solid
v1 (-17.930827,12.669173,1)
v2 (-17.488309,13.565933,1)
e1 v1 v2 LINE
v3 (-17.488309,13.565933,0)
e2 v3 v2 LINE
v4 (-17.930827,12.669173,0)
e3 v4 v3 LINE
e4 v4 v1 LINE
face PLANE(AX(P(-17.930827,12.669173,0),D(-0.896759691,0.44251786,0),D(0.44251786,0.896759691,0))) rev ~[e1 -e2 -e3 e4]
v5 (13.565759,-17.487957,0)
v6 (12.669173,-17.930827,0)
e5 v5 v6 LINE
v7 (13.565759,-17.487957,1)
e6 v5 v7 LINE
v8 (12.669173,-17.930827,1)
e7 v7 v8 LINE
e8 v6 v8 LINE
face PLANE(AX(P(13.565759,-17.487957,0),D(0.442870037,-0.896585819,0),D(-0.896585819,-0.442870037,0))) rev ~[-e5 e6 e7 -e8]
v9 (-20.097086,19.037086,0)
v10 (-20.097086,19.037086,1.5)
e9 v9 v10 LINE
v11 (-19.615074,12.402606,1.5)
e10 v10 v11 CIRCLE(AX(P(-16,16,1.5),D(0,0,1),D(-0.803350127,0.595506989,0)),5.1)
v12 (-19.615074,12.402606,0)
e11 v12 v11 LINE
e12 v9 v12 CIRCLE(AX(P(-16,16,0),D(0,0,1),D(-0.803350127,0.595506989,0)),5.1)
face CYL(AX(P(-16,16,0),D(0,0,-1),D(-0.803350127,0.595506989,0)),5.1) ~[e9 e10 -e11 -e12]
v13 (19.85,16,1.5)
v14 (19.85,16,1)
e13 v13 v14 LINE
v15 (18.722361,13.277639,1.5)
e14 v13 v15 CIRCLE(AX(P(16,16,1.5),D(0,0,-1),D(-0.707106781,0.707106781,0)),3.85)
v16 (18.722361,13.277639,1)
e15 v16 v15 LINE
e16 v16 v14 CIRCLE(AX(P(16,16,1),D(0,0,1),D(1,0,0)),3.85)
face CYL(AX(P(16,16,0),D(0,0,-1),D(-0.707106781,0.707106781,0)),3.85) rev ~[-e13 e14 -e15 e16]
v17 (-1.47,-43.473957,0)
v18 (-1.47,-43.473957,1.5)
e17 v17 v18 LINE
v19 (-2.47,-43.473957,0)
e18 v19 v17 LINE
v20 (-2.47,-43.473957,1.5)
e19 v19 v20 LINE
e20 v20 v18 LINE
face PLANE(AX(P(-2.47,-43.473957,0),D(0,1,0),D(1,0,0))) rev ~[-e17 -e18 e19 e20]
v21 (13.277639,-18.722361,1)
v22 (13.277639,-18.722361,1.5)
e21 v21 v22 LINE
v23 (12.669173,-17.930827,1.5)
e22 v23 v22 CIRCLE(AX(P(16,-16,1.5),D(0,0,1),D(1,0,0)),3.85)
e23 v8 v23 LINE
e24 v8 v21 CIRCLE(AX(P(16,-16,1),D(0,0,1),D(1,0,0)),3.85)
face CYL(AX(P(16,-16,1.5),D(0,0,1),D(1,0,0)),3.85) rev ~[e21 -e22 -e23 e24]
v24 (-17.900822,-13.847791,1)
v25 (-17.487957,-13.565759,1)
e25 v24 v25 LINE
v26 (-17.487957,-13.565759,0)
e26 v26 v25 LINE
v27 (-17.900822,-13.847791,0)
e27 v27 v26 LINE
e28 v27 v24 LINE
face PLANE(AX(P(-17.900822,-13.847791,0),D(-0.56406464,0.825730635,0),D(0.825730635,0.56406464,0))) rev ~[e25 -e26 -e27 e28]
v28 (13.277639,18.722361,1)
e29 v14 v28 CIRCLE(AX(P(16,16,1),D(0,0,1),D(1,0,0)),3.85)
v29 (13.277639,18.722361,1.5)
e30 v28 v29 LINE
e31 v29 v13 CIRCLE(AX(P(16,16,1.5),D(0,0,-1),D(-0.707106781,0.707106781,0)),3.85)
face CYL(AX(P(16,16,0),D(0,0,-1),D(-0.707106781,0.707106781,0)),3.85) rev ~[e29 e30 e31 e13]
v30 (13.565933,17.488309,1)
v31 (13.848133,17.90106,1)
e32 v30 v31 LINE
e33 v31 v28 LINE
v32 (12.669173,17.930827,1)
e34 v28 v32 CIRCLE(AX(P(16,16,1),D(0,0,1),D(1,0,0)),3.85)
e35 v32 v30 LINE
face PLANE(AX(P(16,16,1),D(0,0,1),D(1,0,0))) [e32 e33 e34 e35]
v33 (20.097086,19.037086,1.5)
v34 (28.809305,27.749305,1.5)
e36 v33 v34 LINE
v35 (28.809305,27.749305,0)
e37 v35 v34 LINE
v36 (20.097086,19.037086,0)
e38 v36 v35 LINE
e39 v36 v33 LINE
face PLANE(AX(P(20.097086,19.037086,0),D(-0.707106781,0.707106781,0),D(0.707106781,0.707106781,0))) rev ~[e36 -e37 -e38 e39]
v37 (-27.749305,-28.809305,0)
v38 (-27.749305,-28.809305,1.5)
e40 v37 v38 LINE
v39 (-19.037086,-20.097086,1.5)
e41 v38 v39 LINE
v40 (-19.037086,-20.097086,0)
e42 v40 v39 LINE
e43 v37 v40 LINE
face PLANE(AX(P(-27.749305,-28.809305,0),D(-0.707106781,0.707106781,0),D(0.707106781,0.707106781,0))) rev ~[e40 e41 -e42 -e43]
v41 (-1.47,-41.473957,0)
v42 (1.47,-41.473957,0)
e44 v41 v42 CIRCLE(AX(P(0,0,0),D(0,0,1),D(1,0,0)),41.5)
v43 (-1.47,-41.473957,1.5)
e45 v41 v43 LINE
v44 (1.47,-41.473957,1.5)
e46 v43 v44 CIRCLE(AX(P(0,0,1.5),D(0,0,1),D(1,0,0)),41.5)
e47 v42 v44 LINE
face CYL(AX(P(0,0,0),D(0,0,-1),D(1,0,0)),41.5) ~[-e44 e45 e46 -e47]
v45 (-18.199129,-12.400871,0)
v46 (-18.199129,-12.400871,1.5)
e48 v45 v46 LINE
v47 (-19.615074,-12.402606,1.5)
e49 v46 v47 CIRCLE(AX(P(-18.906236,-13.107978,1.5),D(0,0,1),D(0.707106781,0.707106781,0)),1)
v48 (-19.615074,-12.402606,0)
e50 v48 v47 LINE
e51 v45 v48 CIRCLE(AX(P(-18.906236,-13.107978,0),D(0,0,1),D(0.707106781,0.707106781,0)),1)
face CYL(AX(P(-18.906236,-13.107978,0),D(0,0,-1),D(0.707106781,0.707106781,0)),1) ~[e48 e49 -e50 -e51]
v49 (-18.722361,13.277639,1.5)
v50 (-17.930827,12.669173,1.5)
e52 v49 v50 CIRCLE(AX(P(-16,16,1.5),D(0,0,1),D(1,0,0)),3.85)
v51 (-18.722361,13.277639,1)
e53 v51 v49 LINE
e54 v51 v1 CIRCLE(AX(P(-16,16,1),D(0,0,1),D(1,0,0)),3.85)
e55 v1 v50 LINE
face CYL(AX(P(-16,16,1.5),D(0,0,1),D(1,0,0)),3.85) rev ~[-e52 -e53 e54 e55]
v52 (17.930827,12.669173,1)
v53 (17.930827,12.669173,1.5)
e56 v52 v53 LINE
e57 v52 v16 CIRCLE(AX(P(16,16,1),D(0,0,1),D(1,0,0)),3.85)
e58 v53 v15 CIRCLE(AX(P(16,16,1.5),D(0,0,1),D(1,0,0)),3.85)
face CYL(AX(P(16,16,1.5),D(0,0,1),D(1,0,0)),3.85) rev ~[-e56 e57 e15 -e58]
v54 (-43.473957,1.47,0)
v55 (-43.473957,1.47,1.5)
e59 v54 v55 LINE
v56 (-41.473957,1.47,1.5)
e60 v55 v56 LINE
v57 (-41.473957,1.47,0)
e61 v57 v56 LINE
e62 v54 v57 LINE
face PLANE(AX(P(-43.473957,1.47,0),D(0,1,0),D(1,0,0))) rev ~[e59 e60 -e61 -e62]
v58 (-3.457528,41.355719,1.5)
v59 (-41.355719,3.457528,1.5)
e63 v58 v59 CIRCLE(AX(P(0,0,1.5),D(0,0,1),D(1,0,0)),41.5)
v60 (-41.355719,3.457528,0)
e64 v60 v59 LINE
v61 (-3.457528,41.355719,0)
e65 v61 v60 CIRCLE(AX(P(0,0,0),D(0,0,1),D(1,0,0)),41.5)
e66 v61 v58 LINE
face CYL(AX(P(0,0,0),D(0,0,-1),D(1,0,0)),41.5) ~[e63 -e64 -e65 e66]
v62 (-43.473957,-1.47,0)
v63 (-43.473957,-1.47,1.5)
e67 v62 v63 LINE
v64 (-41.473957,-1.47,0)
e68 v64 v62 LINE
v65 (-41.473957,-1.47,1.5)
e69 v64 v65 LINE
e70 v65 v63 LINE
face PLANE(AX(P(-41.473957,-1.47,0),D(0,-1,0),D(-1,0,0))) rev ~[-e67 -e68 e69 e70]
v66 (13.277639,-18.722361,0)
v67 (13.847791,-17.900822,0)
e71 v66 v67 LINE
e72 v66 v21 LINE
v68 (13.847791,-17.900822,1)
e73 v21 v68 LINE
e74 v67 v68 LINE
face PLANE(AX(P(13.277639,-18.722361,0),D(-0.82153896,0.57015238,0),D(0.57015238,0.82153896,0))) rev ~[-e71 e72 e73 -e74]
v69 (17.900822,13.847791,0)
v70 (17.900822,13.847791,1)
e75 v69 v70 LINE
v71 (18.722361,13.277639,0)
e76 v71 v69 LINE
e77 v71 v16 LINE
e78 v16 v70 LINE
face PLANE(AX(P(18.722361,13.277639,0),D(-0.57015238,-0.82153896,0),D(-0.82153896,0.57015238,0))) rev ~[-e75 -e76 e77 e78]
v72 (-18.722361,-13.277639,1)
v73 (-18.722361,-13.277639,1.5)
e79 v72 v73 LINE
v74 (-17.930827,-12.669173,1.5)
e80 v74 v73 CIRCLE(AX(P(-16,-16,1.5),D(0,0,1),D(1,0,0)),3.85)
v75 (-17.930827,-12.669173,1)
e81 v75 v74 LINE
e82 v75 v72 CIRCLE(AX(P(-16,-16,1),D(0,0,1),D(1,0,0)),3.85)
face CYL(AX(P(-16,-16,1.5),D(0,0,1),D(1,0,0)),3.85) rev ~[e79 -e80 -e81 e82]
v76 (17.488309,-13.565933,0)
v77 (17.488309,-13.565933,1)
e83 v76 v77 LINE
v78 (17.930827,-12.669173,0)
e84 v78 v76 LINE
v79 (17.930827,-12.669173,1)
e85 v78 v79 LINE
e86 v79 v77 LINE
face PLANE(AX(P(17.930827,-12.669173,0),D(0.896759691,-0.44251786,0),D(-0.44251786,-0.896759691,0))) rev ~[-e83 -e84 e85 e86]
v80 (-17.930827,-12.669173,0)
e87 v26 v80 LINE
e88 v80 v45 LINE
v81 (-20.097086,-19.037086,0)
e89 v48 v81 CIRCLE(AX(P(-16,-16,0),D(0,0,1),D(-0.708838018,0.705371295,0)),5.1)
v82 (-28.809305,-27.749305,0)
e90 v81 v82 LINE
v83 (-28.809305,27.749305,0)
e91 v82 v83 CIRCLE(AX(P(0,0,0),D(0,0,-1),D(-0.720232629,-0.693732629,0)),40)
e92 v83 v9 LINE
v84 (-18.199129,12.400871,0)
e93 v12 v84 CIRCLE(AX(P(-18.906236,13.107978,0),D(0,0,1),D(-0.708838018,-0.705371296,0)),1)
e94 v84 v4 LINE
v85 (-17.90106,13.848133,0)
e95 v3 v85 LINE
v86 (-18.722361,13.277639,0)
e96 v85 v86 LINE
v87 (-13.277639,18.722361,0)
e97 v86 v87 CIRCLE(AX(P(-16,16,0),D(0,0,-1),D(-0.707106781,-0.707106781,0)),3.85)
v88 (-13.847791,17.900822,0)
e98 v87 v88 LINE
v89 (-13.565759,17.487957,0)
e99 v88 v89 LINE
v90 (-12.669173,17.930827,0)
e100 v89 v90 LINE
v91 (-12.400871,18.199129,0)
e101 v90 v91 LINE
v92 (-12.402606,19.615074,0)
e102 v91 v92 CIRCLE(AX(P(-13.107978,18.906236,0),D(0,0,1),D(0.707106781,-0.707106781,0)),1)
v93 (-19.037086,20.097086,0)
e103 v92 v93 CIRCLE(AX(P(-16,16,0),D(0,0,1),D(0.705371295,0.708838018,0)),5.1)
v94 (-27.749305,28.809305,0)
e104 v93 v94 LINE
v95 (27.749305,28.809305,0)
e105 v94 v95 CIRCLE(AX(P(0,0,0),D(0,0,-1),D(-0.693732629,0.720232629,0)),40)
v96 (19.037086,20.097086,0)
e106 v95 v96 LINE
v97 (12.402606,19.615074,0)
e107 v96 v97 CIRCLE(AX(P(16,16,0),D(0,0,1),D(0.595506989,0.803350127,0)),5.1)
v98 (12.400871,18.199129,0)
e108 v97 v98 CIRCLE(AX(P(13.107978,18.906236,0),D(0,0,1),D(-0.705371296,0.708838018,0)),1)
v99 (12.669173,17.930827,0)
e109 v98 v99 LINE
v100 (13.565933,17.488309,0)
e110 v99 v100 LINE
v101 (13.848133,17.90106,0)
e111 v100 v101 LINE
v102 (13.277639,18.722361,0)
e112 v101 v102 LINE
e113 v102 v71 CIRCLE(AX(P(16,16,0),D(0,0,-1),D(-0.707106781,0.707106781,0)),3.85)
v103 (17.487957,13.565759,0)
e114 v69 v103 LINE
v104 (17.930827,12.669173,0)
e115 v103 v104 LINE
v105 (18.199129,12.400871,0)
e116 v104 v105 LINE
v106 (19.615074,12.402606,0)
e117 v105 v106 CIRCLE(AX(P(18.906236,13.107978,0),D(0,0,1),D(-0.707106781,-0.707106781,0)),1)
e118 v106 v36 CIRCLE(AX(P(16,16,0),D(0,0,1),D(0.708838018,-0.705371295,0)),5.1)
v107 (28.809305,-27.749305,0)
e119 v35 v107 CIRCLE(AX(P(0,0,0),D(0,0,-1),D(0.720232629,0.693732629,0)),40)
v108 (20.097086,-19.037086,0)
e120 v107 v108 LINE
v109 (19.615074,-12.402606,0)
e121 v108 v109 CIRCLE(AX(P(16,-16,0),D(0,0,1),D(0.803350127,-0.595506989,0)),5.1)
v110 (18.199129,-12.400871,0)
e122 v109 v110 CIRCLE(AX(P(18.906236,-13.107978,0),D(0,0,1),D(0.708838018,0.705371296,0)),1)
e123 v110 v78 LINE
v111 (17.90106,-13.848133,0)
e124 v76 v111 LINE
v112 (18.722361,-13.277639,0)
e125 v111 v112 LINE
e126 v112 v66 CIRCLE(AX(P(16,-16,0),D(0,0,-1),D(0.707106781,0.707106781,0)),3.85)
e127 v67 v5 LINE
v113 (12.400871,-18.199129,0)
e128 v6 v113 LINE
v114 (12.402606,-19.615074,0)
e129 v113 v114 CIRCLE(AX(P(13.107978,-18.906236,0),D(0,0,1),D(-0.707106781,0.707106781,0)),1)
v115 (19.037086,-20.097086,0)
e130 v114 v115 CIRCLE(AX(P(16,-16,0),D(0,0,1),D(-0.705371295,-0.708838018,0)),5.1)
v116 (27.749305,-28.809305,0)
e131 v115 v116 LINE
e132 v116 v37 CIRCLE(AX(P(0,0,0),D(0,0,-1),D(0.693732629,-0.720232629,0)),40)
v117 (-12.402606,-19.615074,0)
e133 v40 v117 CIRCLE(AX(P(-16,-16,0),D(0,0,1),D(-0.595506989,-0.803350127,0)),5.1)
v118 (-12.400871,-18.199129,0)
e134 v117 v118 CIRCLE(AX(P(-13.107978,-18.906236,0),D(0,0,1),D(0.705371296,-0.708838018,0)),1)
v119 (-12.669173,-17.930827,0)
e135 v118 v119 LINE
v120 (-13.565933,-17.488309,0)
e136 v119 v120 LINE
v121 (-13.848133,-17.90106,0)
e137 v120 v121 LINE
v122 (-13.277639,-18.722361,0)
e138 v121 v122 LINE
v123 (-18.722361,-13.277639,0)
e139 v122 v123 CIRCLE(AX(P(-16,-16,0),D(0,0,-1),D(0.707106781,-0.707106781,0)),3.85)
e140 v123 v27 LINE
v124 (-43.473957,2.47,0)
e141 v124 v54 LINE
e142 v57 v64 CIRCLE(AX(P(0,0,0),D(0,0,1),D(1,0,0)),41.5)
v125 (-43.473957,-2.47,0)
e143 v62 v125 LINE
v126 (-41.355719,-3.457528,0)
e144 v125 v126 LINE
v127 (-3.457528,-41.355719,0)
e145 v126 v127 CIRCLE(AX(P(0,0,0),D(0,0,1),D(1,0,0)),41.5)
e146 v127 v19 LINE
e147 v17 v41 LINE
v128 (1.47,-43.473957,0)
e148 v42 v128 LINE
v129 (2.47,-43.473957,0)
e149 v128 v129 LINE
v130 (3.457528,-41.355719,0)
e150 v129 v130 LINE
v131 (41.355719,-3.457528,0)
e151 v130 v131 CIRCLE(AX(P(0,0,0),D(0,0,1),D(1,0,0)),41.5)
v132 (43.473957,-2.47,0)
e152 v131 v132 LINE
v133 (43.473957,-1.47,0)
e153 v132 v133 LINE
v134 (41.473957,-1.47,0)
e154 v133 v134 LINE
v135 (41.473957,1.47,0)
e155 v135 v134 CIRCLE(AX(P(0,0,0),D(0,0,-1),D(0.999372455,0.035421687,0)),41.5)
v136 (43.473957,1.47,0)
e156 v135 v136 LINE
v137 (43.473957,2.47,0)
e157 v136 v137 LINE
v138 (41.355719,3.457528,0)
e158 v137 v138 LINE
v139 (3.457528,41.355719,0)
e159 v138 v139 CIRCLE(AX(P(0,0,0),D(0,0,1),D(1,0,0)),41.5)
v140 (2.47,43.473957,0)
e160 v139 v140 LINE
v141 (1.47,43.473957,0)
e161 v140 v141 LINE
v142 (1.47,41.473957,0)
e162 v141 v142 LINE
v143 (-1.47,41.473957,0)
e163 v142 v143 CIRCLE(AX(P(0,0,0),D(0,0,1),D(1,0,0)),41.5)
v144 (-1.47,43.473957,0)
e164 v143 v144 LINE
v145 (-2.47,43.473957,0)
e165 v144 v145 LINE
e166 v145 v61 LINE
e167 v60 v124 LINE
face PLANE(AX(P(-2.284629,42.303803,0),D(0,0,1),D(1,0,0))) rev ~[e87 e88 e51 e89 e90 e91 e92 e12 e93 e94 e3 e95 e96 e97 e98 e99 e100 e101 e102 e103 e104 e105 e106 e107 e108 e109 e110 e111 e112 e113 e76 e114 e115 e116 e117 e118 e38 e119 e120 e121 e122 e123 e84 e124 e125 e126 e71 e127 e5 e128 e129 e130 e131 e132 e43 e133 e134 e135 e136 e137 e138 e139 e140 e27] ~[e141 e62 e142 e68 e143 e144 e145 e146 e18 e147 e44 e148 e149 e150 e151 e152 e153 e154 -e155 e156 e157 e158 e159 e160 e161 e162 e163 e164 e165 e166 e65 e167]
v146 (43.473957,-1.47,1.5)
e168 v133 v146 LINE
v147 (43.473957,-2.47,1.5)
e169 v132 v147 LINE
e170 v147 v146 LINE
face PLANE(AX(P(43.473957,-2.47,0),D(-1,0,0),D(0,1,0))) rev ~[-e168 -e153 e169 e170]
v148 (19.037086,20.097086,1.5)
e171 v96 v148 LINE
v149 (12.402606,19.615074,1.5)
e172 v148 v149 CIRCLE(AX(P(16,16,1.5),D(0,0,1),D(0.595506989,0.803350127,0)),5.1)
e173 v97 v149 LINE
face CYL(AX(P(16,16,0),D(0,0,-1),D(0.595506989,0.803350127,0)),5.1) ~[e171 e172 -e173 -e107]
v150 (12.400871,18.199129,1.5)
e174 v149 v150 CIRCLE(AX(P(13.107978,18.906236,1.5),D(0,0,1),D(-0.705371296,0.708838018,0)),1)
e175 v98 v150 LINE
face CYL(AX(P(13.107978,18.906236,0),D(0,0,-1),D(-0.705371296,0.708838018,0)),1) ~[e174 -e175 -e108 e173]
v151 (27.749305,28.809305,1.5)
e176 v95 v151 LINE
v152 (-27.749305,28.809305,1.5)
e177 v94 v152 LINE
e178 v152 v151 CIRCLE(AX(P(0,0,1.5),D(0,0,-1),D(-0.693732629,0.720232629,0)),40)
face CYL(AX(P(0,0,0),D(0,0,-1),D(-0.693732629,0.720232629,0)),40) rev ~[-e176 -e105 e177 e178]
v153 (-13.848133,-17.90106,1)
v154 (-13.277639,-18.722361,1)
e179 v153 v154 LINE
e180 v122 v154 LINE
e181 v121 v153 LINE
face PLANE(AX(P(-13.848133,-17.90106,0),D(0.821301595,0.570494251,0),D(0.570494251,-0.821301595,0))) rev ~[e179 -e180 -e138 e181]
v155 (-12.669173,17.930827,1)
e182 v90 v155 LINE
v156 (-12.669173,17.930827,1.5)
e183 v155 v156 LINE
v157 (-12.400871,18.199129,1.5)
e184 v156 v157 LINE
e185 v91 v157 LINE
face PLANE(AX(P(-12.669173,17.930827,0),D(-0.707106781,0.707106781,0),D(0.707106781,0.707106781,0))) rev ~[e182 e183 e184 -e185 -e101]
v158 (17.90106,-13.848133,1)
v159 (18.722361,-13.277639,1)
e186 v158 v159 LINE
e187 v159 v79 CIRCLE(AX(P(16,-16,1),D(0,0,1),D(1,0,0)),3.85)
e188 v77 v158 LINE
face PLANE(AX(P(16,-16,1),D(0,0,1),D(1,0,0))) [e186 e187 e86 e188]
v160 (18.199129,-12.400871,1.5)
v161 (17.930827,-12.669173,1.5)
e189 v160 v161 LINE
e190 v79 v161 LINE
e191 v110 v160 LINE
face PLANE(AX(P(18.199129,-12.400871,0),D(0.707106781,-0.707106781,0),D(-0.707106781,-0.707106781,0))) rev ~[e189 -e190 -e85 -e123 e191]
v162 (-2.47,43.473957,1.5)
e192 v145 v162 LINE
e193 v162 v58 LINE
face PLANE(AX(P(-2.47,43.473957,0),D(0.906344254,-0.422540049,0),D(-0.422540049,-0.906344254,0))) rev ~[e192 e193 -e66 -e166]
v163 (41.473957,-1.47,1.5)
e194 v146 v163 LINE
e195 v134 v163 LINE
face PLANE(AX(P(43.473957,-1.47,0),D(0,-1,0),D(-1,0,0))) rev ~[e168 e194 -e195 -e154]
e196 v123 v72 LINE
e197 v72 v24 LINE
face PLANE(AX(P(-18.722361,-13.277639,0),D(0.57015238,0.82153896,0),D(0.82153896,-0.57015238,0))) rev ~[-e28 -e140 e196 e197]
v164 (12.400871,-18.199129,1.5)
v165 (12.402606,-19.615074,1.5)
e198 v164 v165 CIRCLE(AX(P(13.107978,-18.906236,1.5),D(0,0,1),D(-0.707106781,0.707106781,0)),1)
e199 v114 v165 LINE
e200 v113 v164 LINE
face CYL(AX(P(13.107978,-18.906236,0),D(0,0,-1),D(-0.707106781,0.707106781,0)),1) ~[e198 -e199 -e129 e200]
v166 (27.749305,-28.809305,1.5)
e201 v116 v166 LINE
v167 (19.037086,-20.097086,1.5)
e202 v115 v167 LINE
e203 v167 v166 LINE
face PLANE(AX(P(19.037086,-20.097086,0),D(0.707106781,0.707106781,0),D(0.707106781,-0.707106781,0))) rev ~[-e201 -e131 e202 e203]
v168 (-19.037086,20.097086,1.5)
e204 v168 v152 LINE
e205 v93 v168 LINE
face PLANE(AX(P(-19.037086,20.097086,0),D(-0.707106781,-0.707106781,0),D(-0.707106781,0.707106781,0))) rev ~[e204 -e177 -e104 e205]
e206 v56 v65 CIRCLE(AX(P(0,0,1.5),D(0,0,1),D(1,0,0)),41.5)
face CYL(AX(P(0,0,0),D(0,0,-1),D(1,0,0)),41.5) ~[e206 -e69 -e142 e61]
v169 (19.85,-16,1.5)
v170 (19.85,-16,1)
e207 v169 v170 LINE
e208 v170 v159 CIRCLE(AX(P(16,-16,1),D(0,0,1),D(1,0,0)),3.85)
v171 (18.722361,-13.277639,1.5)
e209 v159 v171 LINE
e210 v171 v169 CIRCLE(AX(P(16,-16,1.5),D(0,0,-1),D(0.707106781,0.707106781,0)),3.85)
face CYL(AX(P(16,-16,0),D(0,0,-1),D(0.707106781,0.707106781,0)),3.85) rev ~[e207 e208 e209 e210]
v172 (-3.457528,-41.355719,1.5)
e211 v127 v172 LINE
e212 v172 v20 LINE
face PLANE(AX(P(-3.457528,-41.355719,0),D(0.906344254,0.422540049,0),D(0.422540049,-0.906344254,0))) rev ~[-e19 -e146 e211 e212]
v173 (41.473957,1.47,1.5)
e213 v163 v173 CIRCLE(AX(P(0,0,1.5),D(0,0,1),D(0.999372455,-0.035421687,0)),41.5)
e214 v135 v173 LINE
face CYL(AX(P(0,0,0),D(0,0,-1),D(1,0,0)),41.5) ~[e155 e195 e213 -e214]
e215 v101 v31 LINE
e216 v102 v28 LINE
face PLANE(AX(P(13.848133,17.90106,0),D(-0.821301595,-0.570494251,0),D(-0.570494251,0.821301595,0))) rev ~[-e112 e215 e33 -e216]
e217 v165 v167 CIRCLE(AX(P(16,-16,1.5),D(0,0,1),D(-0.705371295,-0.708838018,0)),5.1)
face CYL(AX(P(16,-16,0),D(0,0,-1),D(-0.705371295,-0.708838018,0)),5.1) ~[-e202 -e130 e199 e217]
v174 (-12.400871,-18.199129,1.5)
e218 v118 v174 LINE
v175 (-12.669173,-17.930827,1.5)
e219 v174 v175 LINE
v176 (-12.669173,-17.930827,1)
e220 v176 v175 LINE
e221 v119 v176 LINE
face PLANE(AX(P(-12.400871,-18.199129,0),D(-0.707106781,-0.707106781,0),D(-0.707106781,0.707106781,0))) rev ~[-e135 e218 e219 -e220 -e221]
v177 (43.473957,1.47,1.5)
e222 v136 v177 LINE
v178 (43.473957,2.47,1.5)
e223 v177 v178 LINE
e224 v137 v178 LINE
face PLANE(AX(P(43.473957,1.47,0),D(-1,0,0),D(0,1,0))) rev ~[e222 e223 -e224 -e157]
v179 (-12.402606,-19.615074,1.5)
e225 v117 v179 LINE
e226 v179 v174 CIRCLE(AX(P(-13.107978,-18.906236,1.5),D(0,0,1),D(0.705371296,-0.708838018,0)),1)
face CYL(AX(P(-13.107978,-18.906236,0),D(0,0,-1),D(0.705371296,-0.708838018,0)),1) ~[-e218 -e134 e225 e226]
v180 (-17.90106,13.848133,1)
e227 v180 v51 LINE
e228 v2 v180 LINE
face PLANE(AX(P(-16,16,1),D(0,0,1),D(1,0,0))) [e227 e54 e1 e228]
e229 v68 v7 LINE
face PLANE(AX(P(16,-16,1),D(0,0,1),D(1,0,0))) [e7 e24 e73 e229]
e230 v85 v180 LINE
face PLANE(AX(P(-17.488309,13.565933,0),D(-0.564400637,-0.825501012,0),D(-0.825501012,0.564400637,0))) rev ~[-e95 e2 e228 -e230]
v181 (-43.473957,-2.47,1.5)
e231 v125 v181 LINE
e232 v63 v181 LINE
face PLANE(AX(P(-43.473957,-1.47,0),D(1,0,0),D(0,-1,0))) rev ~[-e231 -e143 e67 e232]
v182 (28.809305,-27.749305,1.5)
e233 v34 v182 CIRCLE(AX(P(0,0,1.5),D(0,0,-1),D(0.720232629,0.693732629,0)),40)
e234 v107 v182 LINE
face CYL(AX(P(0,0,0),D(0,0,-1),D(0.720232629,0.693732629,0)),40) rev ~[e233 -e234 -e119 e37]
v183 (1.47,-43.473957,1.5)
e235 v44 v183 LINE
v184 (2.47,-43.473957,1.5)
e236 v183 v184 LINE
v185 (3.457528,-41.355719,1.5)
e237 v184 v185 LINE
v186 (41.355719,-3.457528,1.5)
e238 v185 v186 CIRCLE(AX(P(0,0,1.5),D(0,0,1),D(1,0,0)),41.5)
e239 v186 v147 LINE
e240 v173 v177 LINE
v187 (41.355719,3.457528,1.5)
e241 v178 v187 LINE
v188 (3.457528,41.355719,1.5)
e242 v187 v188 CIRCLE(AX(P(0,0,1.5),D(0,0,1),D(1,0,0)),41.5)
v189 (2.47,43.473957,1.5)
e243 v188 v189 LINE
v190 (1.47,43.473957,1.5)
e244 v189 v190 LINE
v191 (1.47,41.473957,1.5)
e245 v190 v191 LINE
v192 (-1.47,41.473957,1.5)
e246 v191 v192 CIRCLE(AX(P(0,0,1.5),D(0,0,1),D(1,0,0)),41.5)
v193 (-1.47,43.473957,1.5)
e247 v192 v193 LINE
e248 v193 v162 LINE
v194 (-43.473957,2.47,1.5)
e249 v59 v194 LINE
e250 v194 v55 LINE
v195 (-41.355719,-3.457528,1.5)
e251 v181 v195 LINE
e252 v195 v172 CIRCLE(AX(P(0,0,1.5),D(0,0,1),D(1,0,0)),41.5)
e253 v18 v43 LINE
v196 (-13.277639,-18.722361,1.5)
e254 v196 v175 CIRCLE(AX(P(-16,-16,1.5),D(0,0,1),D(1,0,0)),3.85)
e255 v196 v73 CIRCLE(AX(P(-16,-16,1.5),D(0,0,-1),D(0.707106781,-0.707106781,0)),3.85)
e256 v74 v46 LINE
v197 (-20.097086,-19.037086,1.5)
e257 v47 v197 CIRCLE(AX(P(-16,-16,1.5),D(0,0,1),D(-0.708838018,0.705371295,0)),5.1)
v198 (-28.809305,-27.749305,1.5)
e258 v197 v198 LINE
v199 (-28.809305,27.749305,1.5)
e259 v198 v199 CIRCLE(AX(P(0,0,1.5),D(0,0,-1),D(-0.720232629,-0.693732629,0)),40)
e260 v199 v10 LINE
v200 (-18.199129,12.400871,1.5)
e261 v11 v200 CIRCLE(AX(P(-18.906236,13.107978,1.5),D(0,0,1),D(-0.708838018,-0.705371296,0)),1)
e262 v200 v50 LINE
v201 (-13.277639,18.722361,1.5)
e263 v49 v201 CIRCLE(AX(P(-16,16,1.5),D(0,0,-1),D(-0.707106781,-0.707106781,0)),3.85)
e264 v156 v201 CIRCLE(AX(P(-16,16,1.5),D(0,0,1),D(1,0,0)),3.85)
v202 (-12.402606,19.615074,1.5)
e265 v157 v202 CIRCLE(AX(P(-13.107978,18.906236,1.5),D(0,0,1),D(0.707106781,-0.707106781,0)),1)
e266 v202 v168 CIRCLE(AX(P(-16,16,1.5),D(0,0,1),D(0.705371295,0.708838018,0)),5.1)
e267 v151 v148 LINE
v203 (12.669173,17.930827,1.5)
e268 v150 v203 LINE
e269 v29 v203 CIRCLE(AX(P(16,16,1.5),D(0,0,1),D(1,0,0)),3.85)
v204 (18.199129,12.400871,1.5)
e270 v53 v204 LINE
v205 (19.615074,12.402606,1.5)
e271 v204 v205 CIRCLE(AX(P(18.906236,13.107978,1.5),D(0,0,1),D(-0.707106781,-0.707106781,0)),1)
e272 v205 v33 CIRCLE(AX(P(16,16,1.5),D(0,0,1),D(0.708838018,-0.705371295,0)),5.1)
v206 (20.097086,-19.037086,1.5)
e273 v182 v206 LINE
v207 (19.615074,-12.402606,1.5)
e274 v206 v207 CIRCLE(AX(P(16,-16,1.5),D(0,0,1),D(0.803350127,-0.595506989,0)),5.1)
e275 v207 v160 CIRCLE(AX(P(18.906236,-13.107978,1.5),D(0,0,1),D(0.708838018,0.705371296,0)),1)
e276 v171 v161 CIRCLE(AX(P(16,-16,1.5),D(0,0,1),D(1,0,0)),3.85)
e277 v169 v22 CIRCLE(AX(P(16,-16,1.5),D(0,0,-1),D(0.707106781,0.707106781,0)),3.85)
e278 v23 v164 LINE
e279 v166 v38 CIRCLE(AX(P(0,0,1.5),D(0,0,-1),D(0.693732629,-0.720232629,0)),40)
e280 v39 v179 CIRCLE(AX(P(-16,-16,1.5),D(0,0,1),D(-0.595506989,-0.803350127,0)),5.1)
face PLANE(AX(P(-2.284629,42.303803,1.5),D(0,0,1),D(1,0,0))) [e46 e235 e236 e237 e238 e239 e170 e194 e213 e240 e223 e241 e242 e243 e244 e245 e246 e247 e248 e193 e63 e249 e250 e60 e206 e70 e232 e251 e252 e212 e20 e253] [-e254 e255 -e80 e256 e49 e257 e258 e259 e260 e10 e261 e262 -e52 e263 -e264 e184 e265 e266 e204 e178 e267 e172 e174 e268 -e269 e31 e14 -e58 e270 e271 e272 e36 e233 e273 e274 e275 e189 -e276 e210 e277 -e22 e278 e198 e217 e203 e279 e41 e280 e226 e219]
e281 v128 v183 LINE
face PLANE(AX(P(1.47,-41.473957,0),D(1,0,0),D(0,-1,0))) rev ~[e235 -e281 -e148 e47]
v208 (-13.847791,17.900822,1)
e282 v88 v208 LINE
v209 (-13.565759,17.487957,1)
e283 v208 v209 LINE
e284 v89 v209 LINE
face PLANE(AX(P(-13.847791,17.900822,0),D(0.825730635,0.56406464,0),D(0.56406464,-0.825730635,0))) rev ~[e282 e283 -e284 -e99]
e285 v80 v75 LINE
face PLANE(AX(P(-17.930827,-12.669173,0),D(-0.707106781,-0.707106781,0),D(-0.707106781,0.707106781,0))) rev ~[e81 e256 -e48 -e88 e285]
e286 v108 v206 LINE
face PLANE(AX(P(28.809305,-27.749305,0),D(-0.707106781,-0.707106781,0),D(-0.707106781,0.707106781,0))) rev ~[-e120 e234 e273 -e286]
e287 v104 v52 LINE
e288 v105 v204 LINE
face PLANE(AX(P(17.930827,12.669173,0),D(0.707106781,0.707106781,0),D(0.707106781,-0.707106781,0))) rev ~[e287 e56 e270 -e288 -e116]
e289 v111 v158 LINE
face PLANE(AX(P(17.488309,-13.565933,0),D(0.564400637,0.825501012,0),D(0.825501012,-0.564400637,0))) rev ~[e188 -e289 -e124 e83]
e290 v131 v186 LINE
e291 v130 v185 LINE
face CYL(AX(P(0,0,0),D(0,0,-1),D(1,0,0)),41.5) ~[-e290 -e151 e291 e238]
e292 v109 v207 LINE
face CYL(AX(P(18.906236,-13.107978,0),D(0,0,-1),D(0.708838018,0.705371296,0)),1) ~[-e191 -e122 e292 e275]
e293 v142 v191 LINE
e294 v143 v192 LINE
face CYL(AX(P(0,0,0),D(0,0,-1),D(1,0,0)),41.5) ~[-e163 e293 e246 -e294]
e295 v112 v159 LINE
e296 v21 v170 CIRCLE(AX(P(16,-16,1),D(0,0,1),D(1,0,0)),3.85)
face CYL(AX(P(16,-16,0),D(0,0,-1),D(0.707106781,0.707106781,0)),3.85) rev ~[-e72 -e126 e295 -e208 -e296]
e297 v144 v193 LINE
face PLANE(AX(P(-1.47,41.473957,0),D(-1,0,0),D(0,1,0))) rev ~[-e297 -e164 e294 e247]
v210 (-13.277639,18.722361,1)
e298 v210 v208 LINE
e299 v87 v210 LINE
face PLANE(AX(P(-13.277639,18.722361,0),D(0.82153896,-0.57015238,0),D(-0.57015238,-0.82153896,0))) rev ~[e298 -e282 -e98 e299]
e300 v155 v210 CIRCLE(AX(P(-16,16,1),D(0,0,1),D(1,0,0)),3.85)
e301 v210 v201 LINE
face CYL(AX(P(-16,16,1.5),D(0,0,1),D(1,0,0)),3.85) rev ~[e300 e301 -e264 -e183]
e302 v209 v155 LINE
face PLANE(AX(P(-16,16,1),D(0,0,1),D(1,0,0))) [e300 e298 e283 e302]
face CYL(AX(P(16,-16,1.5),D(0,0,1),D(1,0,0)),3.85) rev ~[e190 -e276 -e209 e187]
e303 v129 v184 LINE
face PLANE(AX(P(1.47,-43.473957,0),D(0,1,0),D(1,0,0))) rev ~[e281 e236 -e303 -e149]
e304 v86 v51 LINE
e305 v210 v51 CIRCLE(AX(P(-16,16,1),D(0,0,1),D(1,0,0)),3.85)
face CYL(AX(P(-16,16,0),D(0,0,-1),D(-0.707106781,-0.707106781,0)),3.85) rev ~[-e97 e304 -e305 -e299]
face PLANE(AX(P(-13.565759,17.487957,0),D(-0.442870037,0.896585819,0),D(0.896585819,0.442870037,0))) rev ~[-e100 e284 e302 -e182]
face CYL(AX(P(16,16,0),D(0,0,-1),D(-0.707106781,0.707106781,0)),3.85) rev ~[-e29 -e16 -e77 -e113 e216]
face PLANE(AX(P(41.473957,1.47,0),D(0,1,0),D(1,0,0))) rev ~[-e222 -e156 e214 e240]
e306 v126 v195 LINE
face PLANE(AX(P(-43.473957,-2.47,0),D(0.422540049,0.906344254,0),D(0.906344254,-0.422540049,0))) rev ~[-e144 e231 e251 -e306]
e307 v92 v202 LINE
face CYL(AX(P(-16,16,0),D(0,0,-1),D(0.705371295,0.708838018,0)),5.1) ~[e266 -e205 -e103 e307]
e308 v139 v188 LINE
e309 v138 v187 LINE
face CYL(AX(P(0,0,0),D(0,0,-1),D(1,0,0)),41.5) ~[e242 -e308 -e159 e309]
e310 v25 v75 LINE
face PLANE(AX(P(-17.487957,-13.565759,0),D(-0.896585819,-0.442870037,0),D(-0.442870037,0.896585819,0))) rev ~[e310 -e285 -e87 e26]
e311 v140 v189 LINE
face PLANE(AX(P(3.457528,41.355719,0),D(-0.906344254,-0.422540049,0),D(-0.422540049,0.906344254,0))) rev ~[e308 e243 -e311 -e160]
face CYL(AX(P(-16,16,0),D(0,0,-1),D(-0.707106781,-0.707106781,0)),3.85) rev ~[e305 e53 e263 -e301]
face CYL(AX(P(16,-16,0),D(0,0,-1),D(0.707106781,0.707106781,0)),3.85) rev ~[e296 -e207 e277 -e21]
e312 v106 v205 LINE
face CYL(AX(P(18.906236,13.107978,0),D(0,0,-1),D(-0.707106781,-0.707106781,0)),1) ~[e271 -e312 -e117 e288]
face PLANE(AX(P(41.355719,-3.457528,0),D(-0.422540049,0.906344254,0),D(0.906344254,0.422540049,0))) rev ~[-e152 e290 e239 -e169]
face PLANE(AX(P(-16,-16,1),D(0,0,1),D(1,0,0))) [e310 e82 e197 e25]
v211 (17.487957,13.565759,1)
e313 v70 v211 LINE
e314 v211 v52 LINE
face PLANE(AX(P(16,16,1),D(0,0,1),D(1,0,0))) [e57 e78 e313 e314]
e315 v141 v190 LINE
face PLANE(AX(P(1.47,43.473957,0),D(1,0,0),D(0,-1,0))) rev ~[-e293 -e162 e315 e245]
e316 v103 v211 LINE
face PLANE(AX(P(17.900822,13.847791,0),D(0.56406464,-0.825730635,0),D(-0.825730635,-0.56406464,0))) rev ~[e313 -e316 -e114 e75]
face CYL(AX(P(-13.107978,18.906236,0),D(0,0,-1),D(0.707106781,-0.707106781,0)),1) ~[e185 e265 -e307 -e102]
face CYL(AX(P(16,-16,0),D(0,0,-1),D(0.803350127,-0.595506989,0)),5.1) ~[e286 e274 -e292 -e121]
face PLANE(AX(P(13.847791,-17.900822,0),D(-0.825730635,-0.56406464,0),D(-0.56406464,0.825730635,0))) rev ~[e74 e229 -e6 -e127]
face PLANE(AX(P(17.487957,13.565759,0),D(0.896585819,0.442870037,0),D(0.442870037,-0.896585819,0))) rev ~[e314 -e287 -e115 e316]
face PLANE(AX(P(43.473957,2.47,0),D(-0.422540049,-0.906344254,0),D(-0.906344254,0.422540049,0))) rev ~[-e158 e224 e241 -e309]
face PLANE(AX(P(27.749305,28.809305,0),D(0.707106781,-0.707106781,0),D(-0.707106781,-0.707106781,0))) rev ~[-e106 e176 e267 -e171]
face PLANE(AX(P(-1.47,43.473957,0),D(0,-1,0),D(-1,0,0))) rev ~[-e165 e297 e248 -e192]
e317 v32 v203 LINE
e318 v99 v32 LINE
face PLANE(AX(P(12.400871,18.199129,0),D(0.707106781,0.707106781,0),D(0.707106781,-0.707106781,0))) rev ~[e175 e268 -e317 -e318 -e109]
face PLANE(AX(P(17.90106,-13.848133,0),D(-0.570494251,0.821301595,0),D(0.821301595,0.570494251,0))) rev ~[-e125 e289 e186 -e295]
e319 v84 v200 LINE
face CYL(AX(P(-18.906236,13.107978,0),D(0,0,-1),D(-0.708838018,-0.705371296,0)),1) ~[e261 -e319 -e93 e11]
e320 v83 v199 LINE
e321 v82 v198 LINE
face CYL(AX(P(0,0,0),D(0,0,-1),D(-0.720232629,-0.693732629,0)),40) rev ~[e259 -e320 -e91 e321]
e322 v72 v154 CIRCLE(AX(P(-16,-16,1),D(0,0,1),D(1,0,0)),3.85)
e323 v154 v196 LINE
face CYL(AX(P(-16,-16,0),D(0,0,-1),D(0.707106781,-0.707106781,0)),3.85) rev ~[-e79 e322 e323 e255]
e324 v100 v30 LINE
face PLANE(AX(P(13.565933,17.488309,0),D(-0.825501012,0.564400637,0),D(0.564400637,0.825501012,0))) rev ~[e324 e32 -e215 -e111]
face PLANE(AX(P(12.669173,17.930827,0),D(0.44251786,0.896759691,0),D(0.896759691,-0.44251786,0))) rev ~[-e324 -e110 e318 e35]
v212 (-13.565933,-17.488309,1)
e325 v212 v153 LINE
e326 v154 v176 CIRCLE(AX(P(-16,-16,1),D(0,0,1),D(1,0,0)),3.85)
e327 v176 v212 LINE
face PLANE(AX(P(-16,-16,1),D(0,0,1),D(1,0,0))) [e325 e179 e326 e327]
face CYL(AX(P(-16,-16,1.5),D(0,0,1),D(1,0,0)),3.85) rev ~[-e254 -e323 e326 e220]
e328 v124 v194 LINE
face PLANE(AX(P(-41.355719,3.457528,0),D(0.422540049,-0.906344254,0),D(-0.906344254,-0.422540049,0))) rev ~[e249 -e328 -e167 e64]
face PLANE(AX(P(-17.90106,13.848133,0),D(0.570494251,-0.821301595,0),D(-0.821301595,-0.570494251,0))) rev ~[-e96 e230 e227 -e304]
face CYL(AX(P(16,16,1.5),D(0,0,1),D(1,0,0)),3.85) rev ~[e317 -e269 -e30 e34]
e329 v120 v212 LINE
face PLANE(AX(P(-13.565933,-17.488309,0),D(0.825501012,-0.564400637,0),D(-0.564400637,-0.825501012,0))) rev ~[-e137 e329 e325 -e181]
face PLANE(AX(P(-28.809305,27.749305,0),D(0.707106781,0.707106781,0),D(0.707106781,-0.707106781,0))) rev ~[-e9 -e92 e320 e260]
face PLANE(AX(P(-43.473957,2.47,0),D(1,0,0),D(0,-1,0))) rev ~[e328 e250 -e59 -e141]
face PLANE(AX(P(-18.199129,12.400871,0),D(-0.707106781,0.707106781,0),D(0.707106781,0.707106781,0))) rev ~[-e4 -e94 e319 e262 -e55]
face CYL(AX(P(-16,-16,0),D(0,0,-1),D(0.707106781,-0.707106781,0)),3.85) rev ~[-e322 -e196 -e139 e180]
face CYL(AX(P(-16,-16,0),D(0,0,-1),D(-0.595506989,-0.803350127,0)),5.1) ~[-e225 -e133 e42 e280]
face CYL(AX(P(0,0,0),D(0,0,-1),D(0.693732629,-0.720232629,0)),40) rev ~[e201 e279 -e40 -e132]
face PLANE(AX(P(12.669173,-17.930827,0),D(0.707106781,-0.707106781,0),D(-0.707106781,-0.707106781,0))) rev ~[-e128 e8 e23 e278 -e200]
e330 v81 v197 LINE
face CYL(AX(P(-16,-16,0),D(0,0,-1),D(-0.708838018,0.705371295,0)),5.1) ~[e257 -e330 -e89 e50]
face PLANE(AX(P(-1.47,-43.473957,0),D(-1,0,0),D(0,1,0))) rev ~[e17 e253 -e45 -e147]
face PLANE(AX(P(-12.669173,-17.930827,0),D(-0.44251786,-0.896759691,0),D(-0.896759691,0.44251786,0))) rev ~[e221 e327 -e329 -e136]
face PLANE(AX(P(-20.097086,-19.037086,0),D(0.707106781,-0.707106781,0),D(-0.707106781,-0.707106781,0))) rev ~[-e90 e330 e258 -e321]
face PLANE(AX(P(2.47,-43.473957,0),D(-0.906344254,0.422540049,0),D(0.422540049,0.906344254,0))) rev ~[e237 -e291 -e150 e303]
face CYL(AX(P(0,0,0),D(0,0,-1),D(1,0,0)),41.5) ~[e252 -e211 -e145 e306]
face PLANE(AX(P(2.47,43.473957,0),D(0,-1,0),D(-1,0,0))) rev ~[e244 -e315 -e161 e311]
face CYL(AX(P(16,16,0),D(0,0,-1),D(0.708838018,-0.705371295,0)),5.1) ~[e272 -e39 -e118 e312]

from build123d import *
from build123d import SkipClean  # not in build123d's __all__

# Parameters (mm, degrees)
F1_R     = 41.5
F2_DEPTH = 1.5
F3_R     = 3.85
F4_DEPTH = 0.5
F6_DEPTH = 1.5


with BuildPart() as f2:
    # F1 (on face) → F2 (new body)
    with BuildSketch(Plane.XY):
        Circle(F1_R)
        with BuildLine():
            ThreePointArc((-28.8093051541, -27.7493051541), (-40, 0), (-28.8093051541, 27.7493051541))
            Line((-28.8093051541, 27.7493051541), (-20.0970856452, 19.0370856452))
            ThreePointArc((-20.0970856452, 19.0370856452), (-21.086593154, 15.6304460992), (-19.6150738914, 12.4026063935))
            ThreePointArc((-19.6150738914, 12.4026063935), (-18.9074615459, 12.1079784401), (-18.1991290923, 12.4008709077))
            Line((-18.1991290923, 12.4008709077), (-17.9308268662, 12.6691731338))
            Line((-17.9308268662, 12.6691731338), (-17.4883090065, 13.565932825))
            Line((-17.4883090065, 13.565932825), (-17.9010595127, 13.8481331433))
            Line((-17.9010595127, 13.8481331433), (-18.7223611076, 13.2776388924))
            ThreePointArc((-18.7223611076, 13.2776388924), (-18.7223611076, 18.7223611076), (-13.2776388924, 18.7223611076))
            Line((-13.2776388924, 18.7223611076), (-13.8477912725, 17.9008221471))
            Line((-13.8477912725, 17.9008221471), (-13.5657589526, 17.4879568294))
            Line((-13.5657589526, 17.4879568294), (-12.6691731338, 17.9308268662))
            Line((-12.6691731338, 17.9308268662), (-12.4008709077, 18.1991290923))
            ThreePointArc((-12.4008709077, 18.1991290923), (-12.1079784401, 18.9074615459), (-12.4026063935, 19.6150738914))
            ThreePointArc((-12.4026063935, 19.6150738914), (-15.6304460992, 21.086593154), (-19.0370856452, 20.0970856452))
            Line((-19.0370856452, 20.0970856452), (-27.7493051541, 28.8093051541))
            ThreePointArc((-27.7493051541, 28.8093051541), (0, 40), (27.7493051541, 28.8093051541))
            Line((27.7493051541, 28.8093051541), (19.0370856452, 20.0970856452))
            ThreePointArc((19.0370856452, 20.0970856452), (15.6304460992, 21.086593154), (12.4026063935, 19.6150738914))
            ThreePointArc((12.4026063935, 19.6150738914), (12.1079784401, 18.9074615459), (12.4008709077, 18.1991290923))
            Line((12.4008709077, 18.1991290923), (12.6691731338, 17.9308268662))
            Line((12.6691731338, 17.9308268662), (13.565932825, 17.4883090065))
            Line((13.565932825, 17.4883090065), (13.8481331433, 17.9010595127))
            Line((13.8481331433, 17.9010595127), (13.2776388924, 18.7223611076))
            ThreePointArc((13.2776388924, 18.7223611076), (18.7223611076, 18.7223611076), (18.7223611076, 13.2776388924))
            Line((18.7223611076, 13.2776388924), (17.9008221471, 13.8477912725))
            Line((17.9008221471, 13.8477912725), (17.4879568294, 13.5657589526))
            Line((17.4879568294, 13.5657589526), (17.9308268662, 12.6691731338))
            Line((17.9308268662, 12.6691731338), (18.1991290923, 12.4008709077))
            ThreePointArc((18.1991290923, 12.4008709077), (18.9074615459, 12.1079784401), (19.6150738914, 12.4026063935))
            ThreePointArc((19.6150738914, 12.4026063935), (21.086593154, 15.6304460992), (20.0970856452, 19.0370856452))
            Line((20.0970856452, 19.0370856452), (28.8093051541, 27.7493051541))
            ThreePointArc((28.8093051541, 27.7493051541), (40, 0), (28.8093051541, -27.7493051541))
            Line((28.8093051541, -27.7493051541), (20.0970856452, -19.0370856452))
            ThreePointArc((20.0970856452, -19.0370856452), (21.086593154, -15.6304460992), (19.6150738914, -12.4026063935))
            ThreePointArc((19.6150738914, -12.4026063935), (18.9074615459, -12.1079784401), (18.1991290923, -12.4008709077))
            Line((18.1991290923, -12.4008709077), (17.9308268662, -12.6691731338))
            Line((17.9308268662, -12.6691731338), (17.4883090065, -13.565932825))
            Line((17.4883090065, -13.565932825), (17.9010595127, -13.8481331433))
            Line((17.9010595127, -13.8481331433), (18.7223611076, -13.2776388924))
            ThreePointArc((18.7223611076, -13.2776388924), (18.7223611076, -18.7223611076), (13.2776388924, -18.7223611076))
            Line((13.2776388924, -18.7223611076), (13.8477912725, -17.9008221471))
            Line((13.8477912725, -17.9008221471), (13.5657589526, -17.4879568294))
            Line((13.5657589526, -17.4879568294), (12.6691731338, -17.9308268662))
            Line((12.6691731338, -17.9308268662), (12.4008709077, -18.1991290923))
            ThreePointArc((12.4008709077, -18.1991290923), (12.1079784401, -18.9074615459), (12.4026063935, -19.6150738914))
            ThreePointArc((12.4026063935, -19.6150738914), (15.6304460992, -21.086593154), (19.0370856452, -20.0970856452))
            Line((19.0370856452, -20.0970856452), (27.7493051541, -28.8093051541))
            ThreePointArc((27.7493051541, -28.8093051541), (0, -40), (-27.7493051541, -28.8093051541))
            Line((-27.7493051541, -28.8093051541), (-19.0370856452, -20.0970856452))
            ThreePointArc((-19.0370856452, -20.0970856452), (-15.6304460992, -21.086593154), (-12.4026063935, -19.6150738914))
            ThreePointArc((-12.4026063935, -19.6150738914), (-12.1079784401, -18.9074615459), (-12.4008709077, -18.1991290923))
            Line((-12.4008709077, -18.1991290923), (-12.6691731338, -17.9308268662))
            Line((-12.6691731338, -17.9308268662), (-13.565932825, -17.4883090065))
            Line((-13.565932825, -17.4883090065), (-13.8481331433, -17.9010595127))
            Line((-13.8481331433, -17.9010595127), (-13.2776388924, -18.7223611076))
            ThreePointArc((-13.2776388924, -18.7223611076), (-18.7223611076, -18.7223611076), (-18.7223611076, -13.2776388924))
            Line((-18.7223611076, -13.2776388924), (-17.9008221471, -13.8477912725))
            Line((-17.9008221471, -13.8477912725), (-17.4879568294, -13.5657589526))
            Line((-17.4879568294, -13.5657589526), (-17.9308268662, -12.6691731338))
            Line((-17.9308268662, -12.6691731338), (-18.1991290923, -12.4008709077))
            ThreePointArc((-18.1991290923, -12.4008709077), (-18.9074615459, -12.1079784401), (-19.6150738914, -12.4026063935))
            ThreePointArc((-19.6150738914, -12.4026063935), (-21.086593154, -15.6304460992), (-20.0970856452, -19.0370856452))
            Line((-20.0970856452, -19.0370856452), (-28.8093051541, -27.7493051541))
        make_face(mode=Mode.SUBTRACT)
    extrude(amount=F2_DEPTH)

    # F3 (on face) → F4 (cut)
    with BuildSketch(Plane.XY.offset(1.5)):
        with Locations((-16, 16)):
            Circle(F3_R)
        with Locations((-16, -16)):
            Circle(F3_R)
        with Locations((16, -16)):
            Circle(F3_R)
        with Locations((16, 16)):
            Circle(F3_R)
    with SkipClean():  # cleaning this boolean's faces spoils the solid; the shape is the same uncleaned
        extrude(amount=-F4_DEPTH, mode=Mode.SUBTRACT)

    # F5 (on Top) → F6 (join)
    with BuildSketch(Plane.XY):
        Polygon((-1.47, 41.4739568886), (-1.47, 43.4739568886), (-2.47, 43.4739568886), (-3.4575279787, 41.3557190758), align=None)
        Polygon((2.47, 43.4739568886), (1.47, 43.4739568886), (1.47, 41.4739568886), (3.4575279787, 41.3557190758), align=None)
        Polygon((-43.4739568886, 2.47), (-43.4739568886, 1.47), (-41.4739568886, 1.47), (-41.3557190758, 3.4575279787), align=None)
        Polygon((-41.4739568886, -1.47), (-43.4739568886, -1.47), (-43.4739568886, -2.47), (-41.3557190758, -3.4575279787), align=None)
        Polygon((-2.47, -43.4739568886), (-1.47, -43.4739568886), (-1.47, -41.4739568886), (-3.4575279787, -41.3557190758), align=None)
        Polygon((1.47, -41.4739568886), (1.47, -43.4739568886), (2.47, -43.4739568886), (3.4575279787, -41.3557190758), align=None)
        Polygon((43.4739568886, -2.47), (43.4739568886, -1.47), (41.4739568886, -1.47), (41.3557190758, -3.4575279787), align=None)
        Polygon((41.4739568886, 1.47), (43.4739568886, 1.47), (43.4739568886, 2.47), (41.3557190758, 3.4575279787), align=None)
    extrude(amount=F6_DEPTH)


solid = f2.part
